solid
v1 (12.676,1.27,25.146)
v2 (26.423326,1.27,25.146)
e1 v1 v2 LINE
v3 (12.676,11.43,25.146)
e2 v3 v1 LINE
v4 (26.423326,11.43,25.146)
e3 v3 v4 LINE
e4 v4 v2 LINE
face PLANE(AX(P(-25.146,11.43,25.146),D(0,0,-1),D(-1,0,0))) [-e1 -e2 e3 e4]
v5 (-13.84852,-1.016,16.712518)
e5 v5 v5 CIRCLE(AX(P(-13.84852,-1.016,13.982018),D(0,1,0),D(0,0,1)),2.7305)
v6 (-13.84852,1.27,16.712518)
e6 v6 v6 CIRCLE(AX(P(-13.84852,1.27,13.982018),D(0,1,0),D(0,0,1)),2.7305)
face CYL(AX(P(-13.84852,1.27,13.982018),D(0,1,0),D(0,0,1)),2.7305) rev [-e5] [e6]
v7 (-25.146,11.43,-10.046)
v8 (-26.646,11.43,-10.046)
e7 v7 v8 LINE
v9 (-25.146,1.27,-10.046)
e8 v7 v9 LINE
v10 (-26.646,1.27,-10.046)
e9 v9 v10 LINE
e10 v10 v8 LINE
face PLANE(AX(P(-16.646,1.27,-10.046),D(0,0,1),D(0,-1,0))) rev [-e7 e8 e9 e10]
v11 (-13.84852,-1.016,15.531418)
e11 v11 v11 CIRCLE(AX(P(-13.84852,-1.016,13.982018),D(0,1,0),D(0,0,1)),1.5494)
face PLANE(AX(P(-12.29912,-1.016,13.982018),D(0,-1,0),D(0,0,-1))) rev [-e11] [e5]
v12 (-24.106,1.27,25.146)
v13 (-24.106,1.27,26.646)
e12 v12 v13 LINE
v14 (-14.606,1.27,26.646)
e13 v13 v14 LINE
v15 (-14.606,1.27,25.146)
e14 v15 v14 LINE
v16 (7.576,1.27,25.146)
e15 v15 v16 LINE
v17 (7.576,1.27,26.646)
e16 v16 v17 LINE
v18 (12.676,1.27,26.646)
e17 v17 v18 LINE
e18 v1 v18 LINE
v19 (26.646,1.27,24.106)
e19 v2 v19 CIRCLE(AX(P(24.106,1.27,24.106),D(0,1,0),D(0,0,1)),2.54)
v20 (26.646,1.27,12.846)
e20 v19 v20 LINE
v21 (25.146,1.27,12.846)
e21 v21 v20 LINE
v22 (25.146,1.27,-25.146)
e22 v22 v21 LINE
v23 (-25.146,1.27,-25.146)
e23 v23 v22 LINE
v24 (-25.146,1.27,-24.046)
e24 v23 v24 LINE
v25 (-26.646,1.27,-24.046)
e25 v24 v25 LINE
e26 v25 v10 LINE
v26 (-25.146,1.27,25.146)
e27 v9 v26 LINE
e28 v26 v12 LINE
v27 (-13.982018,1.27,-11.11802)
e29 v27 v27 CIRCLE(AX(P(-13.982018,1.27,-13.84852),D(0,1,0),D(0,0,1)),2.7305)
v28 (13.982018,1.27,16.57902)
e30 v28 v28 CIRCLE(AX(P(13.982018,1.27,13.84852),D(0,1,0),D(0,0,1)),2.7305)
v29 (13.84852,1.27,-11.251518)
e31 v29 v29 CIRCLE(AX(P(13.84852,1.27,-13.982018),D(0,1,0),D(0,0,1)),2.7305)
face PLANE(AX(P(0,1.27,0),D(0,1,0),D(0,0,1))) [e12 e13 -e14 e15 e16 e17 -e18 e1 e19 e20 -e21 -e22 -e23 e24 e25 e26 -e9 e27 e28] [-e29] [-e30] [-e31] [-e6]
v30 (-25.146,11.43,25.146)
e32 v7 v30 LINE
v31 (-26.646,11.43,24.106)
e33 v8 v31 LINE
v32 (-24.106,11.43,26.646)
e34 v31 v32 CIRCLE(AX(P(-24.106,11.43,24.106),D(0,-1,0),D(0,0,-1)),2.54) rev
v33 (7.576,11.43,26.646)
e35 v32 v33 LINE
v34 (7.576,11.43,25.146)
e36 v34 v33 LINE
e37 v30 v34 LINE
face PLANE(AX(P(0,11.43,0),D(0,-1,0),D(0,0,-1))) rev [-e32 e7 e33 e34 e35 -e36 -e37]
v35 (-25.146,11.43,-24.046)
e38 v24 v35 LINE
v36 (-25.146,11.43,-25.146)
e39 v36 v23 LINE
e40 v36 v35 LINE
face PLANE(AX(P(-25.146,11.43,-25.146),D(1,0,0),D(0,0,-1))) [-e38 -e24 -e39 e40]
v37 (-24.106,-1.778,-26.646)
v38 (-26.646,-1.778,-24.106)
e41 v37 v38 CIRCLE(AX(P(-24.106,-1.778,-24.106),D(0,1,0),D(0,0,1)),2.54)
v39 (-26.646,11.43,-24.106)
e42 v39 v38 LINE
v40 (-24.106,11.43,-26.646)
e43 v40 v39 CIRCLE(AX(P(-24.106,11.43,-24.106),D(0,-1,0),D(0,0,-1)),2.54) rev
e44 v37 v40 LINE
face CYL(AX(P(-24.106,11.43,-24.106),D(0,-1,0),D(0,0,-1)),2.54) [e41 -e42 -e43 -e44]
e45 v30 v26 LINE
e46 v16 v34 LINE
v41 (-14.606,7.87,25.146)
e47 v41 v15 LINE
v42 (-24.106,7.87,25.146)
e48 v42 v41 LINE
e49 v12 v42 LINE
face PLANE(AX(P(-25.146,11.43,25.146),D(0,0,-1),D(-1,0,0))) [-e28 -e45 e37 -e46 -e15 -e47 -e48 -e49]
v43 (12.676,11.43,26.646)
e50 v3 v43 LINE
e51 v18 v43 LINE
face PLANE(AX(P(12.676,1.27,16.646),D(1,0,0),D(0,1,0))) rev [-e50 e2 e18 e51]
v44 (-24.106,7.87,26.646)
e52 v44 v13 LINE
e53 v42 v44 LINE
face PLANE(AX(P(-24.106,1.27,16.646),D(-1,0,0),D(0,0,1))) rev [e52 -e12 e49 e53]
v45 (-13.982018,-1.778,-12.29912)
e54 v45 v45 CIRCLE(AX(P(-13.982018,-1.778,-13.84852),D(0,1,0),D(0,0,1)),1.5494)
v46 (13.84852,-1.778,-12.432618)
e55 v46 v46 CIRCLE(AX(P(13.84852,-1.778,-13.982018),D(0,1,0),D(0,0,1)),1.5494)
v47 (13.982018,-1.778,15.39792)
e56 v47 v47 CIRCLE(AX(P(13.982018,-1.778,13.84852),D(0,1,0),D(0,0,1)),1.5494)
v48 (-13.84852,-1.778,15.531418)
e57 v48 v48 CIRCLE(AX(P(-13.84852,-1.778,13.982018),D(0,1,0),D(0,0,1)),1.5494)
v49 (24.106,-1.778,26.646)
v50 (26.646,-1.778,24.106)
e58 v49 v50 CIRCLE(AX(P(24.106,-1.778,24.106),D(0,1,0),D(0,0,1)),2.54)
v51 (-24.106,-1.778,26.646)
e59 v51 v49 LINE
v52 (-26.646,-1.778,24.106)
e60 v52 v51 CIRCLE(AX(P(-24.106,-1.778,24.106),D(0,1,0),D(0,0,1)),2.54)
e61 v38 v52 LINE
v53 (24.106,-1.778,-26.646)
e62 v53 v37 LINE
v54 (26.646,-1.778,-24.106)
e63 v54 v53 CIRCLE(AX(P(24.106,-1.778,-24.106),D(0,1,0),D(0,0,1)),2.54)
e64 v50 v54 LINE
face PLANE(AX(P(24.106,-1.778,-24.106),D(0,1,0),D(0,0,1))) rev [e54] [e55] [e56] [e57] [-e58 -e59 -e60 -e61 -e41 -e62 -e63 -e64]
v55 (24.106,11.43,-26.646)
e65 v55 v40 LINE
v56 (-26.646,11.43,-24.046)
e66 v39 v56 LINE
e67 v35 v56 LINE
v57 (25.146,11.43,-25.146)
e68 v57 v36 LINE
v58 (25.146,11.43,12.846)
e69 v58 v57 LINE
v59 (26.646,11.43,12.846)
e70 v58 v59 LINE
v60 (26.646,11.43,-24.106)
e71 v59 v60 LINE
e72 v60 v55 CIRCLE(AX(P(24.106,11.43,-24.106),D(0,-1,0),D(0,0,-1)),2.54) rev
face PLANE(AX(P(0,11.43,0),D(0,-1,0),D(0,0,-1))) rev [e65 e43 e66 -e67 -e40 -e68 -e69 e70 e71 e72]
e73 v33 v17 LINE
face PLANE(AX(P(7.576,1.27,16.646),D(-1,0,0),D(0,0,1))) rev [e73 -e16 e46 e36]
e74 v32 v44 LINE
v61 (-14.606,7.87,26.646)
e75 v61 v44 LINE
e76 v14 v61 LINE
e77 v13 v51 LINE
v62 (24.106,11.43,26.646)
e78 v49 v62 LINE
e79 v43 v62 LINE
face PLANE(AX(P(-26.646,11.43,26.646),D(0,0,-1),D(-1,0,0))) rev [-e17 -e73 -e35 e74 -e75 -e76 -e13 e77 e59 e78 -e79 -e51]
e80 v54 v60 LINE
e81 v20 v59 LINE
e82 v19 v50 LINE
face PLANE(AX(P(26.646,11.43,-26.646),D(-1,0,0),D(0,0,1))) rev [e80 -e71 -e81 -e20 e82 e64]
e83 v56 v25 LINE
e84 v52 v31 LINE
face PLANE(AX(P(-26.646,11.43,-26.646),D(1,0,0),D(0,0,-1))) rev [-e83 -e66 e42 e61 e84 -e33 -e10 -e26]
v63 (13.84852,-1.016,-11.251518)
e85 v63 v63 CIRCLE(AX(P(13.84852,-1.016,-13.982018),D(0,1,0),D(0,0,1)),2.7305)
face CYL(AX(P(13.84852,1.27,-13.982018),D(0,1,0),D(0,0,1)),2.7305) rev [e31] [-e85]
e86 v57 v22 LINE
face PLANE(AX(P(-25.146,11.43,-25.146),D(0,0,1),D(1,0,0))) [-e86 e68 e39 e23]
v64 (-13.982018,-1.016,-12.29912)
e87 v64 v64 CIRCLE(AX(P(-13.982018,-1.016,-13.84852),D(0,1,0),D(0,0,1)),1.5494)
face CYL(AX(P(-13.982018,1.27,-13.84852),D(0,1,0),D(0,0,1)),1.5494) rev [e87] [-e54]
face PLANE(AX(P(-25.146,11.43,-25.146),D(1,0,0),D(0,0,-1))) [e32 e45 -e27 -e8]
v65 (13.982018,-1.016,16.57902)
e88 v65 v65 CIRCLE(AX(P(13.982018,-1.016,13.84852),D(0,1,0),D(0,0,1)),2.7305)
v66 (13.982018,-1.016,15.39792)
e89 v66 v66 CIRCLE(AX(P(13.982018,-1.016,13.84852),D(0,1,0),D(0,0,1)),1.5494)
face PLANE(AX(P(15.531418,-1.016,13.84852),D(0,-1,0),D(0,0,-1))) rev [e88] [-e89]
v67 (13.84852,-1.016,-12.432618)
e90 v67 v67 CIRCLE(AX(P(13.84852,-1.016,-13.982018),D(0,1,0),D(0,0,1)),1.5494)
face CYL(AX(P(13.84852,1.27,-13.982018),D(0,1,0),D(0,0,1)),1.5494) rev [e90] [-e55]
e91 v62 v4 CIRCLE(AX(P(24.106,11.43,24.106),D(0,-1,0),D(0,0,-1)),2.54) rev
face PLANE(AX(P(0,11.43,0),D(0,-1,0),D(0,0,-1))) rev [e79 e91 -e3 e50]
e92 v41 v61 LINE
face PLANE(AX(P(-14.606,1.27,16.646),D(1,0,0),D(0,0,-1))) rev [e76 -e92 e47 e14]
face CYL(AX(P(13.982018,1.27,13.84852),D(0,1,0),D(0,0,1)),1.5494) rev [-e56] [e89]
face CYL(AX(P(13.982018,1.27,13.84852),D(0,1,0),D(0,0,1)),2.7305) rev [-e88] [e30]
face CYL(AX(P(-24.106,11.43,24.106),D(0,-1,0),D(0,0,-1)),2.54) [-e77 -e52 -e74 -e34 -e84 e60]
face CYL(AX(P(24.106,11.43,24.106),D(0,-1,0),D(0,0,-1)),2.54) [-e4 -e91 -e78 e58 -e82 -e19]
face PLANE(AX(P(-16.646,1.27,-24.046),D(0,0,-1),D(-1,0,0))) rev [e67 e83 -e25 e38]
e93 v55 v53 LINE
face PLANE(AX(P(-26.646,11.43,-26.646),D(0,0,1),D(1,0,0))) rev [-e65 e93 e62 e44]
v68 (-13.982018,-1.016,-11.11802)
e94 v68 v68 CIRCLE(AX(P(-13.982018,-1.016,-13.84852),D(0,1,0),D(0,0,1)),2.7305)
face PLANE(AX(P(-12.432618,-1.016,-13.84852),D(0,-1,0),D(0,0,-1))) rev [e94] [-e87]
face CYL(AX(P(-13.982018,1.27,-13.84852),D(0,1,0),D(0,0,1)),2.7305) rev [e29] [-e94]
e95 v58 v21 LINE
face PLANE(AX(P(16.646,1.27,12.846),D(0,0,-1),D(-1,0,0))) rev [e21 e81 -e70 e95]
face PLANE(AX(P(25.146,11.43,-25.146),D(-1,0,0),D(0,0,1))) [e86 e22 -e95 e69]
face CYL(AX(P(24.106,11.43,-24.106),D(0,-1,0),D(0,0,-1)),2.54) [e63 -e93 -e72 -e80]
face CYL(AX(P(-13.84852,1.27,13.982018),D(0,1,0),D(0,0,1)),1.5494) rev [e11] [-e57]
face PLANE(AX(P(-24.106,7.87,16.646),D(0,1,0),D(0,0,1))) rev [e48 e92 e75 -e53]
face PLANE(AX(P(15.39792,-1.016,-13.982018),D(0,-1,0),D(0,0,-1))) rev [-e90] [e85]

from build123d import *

# Parameters (mm, degrees)
SKETCH1_W           = 50.292
SKETCH1_H           = 50.292
BOSS_EXTRUDE1_DEPTH = 1.27
SKETCH1_3_W         = 53.292
SKETCH1_3_H         = 53.292
SKETCH1_3_W_2       = 50.292
SKETCH1_3_H_2       = 50.292
BOSS_EXTRUDE2_DEPTH = 11.43
SKETCH2_W           = 13.99999994
SKETCH2_H           = 10.16
CUT_EXTRUDE3_DEPTH  = 10
SKETCH3_W           = 9.5
SKETCH3_H           = 6.6
SKETCH3_W_2         = 5.1
SKETCH3_H_2         = 10.16
CUT_EXTRUDE4_DEPTH  = 10
SKETCH4_W           = 12.3
SKETCH4_H           = 10.16
CUT_EXTRUDE5_DEPTH  = 10
FILLET1_R           = 2.54
FILLET2_R           = 2.54
FILLET3_START       = -1
FILLET3_DEPTH       = 13
FILLET4_R           = 2.54
BOSS_EXTRUDE4_DEPTH = 3.048
HOLE1_D             = 3.0988
HOLE1_CBORE_D       = 5.461
HOLE1_CBORE_DEPTH   = 2.286


with BuildPart() as part:
    # Sketch1 → Boss-Extrude1 (new body)
    with BuildSketch(Plane(origin=(0, 0, 0), x_dir=(1, 0, 0), z_dir=(0, 1, 0))):
        Rectangle(SKETCH1_W, SKETCH1_H)
    extrude(amount=BOSS_EXTRUDE1_DEPTH)

    # Sketch1<3> → Boss-Extrude2 (add)
    with BuildSketch(Plane(origin=(0, 0, 0), x_dir=(1, 0, 0), z_dir=(0, 1, 0))):
        Rectangle(SKETCH1_3_W, SKETCH1_3_H)
        Rectangle(SKETCH1_3_W_2, SKETCH1_3_H_2, mode=Mode.SUBTRACT)
    extrude(amount=BOSS_EXTRUDE2_DEPTH)

    # Sketch2 → Cut-Extrude3 (cut)
    with BuildSketch(Plane.ZY.offset(26.646)):
        with Locations((-17.04600003, 6.35)):
            Rectangle(SKETCH2_W, SKETCH2_H)
    extrude(amount=-CUT_EXTRUDE3_DEPTH, mode=Mode.SUBTRACT)

    # Sketch3 → Cut-Extrude4 (cut)
    with BuildSketch(Plane.XY.offset(26.646)):
        with Locations((-19.356, 4.57)):
            Rectangle(SKETCH3_W, SKETCH3_H)
        with Locations((10.126, 6.35)):
            Rectangle(SKETCH3_W_2, SKETCH3_H_2)
    extrude(amount=-CUT_EXTRUDE4_DEPTH, mode=Mode.SUBTRACT)

    # Sketch4 → Cut-Extrude5 (cut)
    with BuildSketch(Plane(origin=(26.646, 0, 0), x_dir=(0, 0, -1), z_dir=(1, 0, 0))):
        with Locations((-18.996, 6.35)):
            Rectangle(SKETCH4_W, SKETCH4_H)
    extrude(amount=-CUT_EXTRUDE5_DEPTH, mode=Mode.SUBTRACT)

    # Fillet1
    fillet1_edges = [part.edges().sort_by_distance(p)[0] for p in [
        (26.646, 5.715, -26.646),
    ]]
    fillet(fillet1_edges, radius=FILLET1_R)

    # Fillet2
    fillet2_edges = [part.edges().sort_by_distance(p)[0] for p in [
        (-26.646, 5.715, -26.646),
    ]]
    fillet(fillet2_edges, radius=FILLET2_R)

    # Fillet3: read off the stored shape, not the designer's step
    # Fillet3 outline → Fillet3 (cut)
    with BuildSketch(Plane(origin=(0, 0, 0), x_dir=(1, 0, 0), z_dir=(0, 1, 0)).offset(FILLET3_START)):
        with BuildLine():
            Line((-26.646, -26.646), (-24.106, -26.646))
            ThreePointArc((-24.106, -26.646), (-25.902051224, -25.902051224), (-26.646, -24.106))
            Line((-26.646, -24.106), (-26.646, -26.646))
        make_face()
    extrude(amount=FILLET3_DEPTH, mode=Mode.SUBTRACT)

    # Fillet4
    fillet4_edges = [part.edges().sort_by_distance(p)[0] for p in [
        (26.646, 5.715, 26.646),
    ]]
    fillet(fillet4_edges, radius=FILLET4_R)

    # Sketch6 → Boss-Extrude4 (add)
    with BuildSketch(Plane(origin=(0, 1.27, 0), x_dir=(1, 0, 0), z_dir=(0, 1, 0))):
        with BuildLine():
            Line((26.646, -24.106), (26.646, 24.106))
            ThreePointArc((26.646, 24.106), (25.902051224, 25.902051224), (24.106, 26.646))
            Line((24.106, 26.646), (-24.106, 26.646))
            ThreePointArc((-24.106, 26.646), (-25.902051224, 25.902051224), (-26.646, 24.106))
            Line((-26.646, 24.106), (-26.646, -24.106))
            ThreePointArc((-26.646, -24.106), (-25.902051224, -25.902051224), (-24.106, -26.646))
            Line((-24.106, -26.646), (24.106, -26.646))
            ThreePointArc((24.106, -26.646), (25.902051224, -25.902051224), (26.646, -24.106))
        make_face()
    extrude(amount=-BOSS_EXTRUDE4_DEPTH)

    # Hole1 (through all)
    with Locations(Plane(origin=(-13.848520203, 1.27, 13.982017818), x_dir=(0, 0, 1), z_dir=(0, 1, 0))):
        with Locations((0, 0), (-27.830538021, -0.133497615), (-27.964035636, 27.697040406), (-0.133497615, 27.830538021)):
            CounterBoreHole(HOLE1_D / 2, HOLE1_CBORE_D / 2, HOLE1_CBORE_DEPTH)


solid = part.part
